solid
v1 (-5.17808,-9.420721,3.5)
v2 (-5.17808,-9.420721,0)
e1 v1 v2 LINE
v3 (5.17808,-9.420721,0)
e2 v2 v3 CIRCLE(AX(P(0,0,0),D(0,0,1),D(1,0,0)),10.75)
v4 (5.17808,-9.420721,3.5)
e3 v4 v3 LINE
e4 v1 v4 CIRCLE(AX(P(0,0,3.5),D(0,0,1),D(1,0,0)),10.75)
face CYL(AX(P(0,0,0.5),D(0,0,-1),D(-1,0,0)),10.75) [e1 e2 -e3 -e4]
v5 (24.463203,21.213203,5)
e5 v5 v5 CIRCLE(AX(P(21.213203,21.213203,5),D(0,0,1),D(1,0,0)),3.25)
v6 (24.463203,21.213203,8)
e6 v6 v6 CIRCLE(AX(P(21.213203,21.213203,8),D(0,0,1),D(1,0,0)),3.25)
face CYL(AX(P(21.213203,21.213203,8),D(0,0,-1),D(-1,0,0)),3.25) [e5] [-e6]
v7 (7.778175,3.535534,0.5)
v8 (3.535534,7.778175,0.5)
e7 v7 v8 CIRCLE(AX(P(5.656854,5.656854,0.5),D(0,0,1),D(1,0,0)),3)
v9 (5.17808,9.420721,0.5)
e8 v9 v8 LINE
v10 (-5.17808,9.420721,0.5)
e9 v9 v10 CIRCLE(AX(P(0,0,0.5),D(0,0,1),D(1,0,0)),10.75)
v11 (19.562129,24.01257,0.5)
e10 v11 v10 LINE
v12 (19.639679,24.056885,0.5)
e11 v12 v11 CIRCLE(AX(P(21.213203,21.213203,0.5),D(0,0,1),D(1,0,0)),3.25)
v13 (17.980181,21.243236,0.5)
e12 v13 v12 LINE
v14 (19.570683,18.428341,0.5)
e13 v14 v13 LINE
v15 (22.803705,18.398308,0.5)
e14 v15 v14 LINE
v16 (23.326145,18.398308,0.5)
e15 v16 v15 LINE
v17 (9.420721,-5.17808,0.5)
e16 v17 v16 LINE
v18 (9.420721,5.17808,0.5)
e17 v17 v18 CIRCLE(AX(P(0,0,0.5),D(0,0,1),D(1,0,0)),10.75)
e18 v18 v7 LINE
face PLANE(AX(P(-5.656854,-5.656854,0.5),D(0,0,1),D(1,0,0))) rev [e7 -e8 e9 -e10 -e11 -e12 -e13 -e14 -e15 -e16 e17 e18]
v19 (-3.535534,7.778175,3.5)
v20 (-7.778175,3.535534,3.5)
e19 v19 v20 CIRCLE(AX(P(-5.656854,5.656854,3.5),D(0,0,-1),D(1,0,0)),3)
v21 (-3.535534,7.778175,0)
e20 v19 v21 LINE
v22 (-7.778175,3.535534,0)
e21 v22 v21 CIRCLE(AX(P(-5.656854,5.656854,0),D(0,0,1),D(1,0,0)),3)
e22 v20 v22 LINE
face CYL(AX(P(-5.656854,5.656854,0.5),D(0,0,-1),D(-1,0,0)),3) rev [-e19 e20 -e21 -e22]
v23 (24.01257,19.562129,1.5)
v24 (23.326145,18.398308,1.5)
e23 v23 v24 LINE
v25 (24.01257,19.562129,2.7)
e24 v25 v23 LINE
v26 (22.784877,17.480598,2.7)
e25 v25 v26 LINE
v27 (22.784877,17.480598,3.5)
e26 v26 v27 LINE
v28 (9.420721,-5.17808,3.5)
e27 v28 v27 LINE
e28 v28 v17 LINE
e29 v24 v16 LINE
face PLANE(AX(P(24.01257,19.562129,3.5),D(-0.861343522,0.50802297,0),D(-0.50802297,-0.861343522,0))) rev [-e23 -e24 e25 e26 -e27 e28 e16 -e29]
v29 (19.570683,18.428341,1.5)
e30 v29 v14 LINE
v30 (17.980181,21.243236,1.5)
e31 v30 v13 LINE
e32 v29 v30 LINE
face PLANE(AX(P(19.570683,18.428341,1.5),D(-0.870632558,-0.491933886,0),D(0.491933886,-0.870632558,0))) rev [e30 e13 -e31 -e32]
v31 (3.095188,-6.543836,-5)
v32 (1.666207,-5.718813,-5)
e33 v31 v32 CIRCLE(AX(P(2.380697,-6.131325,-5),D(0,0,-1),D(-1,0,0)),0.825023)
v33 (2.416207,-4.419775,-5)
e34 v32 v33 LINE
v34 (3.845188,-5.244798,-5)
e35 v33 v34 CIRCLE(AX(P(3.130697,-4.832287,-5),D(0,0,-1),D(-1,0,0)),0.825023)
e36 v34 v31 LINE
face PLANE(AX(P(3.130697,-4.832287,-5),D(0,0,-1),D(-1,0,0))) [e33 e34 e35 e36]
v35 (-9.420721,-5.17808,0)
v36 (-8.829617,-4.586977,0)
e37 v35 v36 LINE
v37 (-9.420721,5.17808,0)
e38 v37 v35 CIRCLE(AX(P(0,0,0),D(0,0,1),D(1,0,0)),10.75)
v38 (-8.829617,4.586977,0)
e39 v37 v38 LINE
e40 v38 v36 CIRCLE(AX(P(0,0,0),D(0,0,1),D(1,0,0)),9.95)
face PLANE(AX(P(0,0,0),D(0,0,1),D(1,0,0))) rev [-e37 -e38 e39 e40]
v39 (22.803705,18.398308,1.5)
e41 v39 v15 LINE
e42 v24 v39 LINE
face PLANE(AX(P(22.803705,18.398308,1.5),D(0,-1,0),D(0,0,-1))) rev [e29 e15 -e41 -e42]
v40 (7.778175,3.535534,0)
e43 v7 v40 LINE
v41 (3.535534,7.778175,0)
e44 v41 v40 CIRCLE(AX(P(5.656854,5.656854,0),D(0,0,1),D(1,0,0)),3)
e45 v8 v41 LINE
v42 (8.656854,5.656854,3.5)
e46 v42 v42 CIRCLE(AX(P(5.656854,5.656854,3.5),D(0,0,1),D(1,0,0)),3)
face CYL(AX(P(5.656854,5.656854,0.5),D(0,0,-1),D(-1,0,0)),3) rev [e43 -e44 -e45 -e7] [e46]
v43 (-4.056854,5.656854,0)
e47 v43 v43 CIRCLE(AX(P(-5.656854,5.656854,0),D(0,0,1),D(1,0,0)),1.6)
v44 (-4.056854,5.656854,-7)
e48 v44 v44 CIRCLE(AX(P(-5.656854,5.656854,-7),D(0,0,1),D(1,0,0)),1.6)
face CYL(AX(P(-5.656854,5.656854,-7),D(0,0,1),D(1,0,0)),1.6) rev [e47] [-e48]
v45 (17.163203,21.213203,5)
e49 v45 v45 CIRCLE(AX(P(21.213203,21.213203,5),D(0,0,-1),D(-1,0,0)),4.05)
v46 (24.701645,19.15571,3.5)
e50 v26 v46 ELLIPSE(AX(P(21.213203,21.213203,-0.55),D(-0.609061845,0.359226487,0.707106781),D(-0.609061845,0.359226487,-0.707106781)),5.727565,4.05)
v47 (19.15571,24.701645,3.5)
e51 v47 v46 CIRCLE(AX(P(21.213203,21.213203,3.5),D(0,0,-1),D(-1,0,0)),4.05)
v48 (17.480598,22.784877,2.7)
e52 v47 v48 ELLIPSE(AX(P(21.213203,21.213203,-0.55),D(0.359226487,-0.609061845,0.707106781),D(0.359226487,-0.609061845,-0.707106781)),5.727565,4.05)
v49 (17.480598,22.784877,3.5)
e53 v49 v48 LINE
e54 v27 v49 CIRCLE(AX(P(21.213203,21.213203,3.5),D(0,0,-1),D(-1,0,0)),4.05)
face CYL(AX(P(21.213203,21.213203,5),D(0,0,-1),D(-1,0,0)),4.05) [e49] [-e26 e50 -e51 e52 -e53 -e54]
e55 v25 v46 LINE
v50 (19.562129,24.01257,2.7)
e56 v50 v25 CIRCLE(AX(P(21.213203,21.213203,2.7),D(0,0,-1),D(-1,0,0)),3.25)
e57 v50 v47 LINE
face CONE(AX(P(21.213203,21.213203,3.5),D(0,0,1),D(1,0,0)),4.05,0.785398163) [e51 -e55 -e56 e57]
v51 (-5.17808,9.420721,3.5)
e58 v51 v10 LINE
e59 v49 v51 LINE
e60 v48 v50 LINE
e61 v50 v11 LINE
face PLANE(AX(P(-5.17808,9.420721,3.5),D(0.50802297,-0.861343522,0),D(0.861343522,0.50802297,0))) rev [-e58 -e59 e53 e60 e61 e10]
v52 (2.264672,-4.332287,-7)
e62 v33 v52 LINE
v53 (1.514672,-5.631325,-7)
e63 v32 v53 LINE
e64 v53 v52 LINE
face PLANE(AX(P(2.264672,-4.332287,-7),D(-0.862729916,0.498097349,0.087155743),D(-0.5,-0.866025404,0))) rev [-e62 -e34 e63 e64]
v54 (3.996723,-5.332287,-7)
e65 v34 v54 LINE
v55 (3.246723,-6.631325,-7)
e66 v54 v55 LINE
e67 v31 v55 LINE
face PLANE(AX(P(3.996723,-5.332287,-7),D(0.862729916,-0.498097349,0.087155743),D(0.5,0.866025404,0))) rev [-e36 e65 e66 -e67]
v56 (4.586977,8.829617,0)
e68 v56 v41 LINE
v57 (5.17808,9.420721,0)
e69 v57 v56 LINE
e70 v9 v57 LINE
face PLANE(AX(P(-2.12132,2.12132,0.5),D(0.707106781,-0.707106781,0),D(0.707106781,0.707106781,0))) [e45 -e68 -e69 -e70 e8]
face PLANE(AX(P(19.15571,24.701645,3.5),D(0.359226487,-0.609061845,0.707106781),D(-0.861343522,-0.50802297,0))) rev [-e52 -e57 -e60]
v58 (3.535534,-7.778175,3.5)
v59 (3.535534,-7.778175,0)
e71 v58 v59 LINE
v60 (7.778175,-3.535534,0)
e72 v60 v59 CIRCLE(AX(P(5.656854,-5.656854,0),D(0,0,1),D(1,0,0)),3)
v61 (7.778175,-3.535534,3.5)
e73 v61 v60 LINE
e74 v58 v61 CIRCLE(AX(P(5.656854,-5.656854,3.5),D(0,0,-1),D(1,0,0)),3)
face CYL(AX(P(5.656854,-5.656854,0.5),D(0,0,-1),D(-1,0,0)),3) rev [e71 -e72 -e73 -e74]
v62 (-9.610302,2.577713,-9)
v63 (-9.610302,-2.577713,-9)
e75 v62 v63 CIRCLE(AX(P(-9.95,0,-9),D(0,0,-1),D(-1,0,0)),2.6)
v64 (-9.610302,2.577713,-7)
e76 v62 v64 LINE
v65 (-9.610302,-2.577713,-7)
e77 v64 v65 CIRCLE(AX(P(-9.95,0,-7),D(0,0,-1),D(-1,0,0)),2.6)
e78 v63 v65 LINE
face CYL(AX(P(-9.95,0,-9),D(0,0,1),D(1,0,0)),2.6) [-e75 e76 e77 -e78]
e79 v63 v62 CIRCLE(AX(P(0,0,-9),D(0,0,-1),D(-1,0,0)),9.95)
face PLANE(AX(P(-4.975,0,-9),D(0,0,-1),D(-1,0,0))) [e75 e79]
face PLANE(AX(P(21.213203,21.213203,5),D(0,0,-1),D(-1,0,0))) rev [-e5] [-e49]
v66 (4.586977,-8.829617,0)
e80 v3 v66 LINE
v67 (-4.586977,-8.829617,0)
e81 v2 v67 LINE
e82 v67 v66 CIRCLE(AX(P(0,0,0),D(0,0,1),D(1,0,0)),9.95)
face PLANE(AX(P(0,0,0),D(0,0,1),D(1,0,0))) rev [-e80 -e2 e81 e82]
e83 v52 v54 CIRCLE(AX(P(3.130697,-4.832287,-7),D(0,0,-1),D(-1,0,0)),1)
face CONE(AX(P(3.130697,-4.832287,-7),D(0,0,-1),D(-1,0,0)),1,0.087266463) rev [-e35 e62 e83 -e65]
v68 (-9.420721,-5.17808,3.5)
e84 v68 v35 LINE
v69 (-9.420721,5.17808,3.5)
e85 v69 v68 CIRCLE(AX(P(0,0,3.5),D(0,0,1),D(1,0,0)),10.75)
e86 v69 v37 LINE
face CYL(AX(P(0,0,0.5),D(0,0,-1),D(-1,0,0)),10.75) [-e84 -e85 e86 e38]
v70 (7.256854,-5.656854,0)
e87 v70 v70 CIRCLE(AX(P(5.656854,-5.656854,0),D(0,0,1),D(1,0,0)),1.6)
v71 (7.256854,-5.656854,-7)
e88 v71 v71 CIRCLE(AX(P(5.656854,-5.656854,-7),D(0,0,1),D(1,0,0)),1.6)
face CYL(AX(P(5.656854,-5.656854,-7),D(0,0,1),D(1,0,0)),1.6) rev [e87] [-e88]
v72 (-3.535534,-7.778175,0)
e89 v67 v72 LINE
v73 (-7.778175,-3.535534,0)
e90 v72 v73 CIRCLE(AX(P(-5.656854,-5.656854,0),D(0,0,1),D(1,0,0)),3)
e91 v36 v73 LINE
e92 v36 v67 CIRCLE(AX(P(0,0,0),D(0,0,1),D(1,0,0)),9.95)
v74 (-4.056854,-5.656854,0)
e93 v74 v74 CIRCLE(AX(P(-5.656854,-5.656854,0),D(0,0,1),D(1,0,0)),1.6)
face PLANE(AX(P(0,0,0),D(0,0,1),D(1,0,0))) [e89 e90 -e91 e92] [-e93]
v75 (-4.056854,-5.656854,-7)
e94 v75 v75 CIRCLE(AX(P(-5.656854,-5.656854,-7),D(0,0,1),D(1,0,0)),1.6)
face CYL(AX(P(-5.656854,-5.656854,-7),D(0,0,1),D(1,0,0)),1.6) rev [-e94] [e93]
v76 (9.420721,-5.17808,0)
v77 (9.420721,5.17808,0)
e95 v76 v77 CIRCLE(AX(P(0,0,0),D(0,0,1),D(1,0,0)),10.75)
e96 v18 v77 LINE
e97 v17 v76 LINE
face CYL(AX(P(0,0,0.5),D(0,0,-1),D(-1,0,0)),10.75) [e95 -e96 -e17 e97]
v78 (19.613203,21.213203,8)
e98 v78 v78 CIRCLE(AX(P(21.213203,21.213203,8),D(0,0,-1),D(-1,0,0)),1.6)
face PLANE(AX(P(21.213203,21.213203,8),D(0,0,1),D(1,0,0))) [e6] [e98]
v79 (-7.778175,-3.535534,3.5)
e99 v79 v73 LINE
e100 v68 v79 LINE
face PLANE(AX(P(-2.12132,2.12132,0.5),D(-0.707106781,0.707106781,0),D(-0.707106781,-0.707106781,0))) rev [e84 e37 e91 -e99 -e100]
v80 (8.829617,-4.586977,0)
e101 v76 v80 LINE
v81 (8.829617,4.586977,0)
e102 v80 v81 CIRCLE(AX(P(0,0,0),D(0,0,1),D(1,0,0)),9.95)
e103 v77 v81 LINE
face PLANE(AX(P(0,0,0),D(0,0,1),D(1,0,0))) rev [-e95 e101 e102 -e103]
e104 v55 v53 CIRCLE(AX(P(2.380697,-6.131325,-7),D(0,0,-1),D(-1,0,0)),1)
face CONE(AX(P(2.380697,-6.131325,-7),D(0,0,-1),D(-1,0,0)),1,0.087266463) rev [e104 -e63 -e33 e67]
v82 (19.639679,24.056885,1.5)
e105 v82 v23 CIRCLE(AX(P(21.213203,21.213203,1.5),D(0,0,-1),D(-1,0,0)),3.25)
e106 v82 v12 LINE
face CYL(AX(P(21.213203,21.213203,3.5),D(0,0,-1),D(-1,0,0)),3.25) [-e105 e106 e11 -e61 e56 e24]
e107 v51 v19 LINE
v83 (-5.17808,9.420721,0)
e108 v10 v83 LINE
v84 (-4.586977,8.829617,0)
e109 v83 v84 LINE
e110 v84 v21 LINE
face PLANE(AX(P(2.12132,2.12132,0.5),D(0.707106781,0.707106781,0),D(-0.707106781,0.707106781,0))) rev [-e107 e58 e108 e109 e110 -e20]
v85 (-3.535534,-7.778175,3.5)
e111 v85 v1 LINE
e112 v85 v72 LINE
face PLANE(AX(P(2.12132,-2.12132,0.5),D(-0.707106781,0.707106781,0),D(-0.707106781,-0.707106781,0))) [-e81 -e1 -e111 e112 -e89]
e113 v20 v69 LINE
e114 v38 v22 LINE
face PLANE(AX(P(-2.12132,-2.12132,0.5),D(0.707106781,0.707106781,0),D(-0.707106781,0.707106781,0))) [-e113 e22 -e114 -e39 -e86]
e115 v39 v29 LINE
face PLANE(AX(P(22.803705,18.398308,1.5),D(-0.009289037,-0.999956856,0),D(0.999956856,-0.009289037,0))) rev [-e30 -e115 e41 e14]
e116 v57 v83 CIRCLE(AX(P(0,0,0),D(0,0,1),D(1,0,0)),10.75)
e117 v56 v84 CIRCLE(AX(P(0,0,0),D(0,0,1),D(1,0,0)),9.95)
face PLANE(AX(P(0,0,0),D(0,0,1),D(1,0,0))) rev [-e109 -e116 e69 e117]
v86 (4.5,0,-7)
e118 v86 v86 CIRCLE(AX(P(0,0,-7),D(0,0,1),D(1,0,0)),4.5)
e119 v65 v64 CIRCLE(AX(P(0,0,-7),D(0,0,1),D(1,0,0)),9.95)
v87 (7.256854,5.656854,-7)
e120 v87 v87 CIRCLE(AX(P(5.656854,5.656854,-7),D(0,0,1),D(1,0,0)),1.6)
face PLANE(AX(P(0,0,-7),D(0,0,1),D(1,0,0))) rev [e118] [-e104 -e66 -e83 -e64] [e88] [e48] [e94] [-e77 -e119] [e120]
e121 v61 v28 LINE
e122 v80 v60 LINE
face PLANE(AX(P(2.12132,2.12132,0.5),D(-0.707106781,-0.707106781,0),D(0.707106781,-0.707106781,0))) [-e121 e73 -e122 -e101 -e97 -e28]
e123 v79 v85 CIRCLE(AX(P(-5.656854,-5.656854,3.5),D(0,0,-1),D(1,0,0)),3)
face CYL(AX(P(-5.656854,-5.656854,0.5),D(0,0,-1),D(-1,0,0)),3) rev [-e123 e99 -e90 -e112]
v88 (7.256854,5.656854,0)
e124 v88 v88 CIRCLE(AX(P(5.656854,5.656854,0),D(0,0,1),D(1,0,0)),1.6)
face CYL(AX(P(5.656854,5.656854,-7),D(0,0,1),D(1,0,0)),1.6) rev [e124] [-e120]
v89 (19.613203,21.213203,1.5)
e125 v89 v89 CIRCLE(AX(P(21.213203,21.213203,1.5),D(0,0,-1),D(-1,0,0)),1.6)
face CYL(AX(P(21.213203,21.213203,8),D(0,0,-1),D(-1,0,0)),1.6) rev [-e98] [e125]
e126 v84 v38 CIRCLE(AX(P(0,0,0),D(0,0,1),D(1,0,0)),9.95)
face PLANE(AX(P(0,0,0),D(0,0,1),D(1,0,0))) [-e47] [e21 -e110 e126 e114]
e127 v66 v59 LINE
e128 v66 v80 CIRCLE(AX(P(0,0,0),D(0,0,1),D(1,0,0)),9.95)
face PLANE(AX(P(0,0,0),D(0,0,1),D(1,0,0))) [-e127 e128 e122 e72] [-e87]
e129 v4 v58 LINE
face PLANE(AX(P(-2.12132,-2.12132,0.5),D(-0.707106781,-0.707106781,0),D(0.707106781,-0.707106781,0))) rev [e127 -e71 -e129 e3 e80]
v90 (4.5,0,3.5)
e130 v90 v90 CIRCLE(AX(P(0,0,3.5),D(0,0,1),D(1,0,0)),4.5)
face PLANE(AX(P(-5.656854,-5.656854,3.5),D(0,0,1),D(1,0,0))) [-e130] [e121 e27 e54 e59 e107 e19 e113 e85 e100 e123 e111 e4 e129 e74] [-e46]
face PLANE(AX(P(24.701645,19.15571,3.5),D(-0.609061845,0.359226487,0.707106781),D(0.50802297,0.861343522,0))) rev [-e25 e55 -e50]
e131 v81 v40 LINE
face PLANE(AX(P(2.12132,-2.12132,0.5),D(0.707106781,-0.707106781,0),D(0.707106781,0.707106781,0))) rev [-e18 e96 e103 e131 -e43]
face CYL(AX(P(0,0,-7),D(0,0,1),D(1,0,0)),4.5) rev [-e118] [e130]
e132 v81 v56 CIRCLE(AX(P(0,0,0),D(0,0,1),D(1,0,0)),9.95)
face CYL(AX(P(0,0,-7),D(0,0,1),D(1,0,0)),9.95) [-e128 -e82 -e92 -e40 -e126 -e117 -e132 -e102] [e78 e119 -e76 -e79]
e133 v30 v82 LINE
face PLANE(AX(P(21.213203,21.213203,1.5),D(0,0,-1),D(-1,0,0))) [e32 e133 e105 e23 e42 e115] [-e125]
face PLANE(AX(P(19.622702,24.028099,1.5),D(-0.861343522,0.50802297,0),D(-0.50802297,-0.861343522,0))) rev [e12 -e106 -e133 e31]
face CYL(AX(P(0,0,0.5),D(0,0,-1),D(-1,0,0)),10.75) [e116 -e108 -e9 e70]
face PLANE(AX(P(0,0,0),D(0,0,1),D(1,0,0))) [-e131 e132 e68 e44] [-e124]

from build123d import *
from build123d.topology import SkipClean

# Parameters (mm, degrees)
SKETCH1_R           = 9.95
SKETCH1_R_2         = 4.5
SKETCH1_R_3         = 1.6
BOSS_EXTRUDE1_DEPTH = 7
BOSS_EXTRUDE3_START = 0.5
SKETCH3_R           = 4.5
BOSS_EXTRUDE3_DEPTH = 0.5
BOSS_EXTRUDE4_START = 3
SKETCH5_R           = 3
SKETCH5_R_2         = 4.5
BOSS_EXTRUDE4_DEPTH = 3
SKETCH6_R           = 4.05
BOSS_EXTRUDE5_DEPTH = 1.5
BOSS_EXTRUDE6_START = 3
SKETCH7_R           = 3.25
BOSS_EXTRUDE6_DEPTH = 3
CHAMFER1_SIZE       = 0.8
CUT_EXTRUDE1_START  = -1
CUT_EXTRUDE1_DEPTH  = 1
SKETCH9_R           = 1.6
CUT_EXTRUDE2_DEPTH  = 37.724772234
BOSS_EXTRUDE7_DEPTH = 2
CUT_EXTRUDE3_DEPTH  = 2
CUT_EXTRUDE3_DRAFT  = -5


with BuildPart() as part:
    # Sketch1 → Boss-Extrude1 (new body)
    with BuildSketch(Plane.XY):
        Circle(SKETCH1_R)
        Circle(SKETCH1_R_2, mode=Mode.SUBTRACT)
        with Locations((-5.656854249, -5.656854249)):
            Circle(SKETCH1_R_3, mode=Mode.SUBTRACT)
        with Locations((-5.656854249, 5.656854249)):
            Circle(SKETCH1_R_3, mode=Mode.SUBTRACT)
        with Locations((5.656854249, 5.656854249)):
            Circle(SKETCH1_R_3, mode=Mode.SUBTRACT)
        with Locations((5.656854249, -5.656854249)):
            Circle(SKETCH1_R_3, mode=Mode.SUBTRACT)
    extrude(amount=-BOSS_EXTRUDE1_DEPTH)

    # Sketch3 → Boss-Extrude3 (add)
    # profile 1 of 5: a face of its own
    with BuildSketch(Plane.XY.offset(BOSS_EXTRUDE3_START)):
        with BuildLine():
            ThreePointArc((4.586976758, 8.829617445), (0, 9.95), (-4.586976758, 8.829617445))
            Line((-4.586976758, 8.829617445), (-3.535533906, 7.778174593))
            ThreePointArc((-3.535533906, 7.778174593), (-3.535533906, 3.535533906), (-7.778174593, 3.535533906))
            Line((-7.778174593, 3.535533906), (-8.829617445, 4.586976758))
            ThreePointArc((-8.829617445, 4.586976758), (-9.95, 0), (-8.829617445, -4.586976758))
            Line((-8.829617445, -4.586976758), (-7.778174593, -3.535533906))
            ThreePointArc((-7.778174593, -3.535533906), (-3.535533906, -3.535533906), (-3.535533906, -7.778174593))
            Line((-3.535533906, -7.778174593), (-4.586976758, -8.829617445))
            ThreePointArc((-4.586976758, -8.829617445), (0, -9.95), (4.586976758, -8.829617445))
            Line((4.586976758, -8.829617445), (3.535533906, -7.778174593))
            ThreePointArc((3.535533906, -7.778174593), (3.535533906, -3.535533906), (7.778174593, -3.535533906))
            Line((7.778174593, -3.535533906), (8.829617445, -4.586976758))
            ThreePointArc((8.829617445, -4.586976758), (9.665846926, -2.360911521), (9.95, 0))
            ThreePointArc((9.95, 0), (9.665846926, 2.360911521), (8.829617445, 4.586976758))
            Line((8.829617445, 4.586976758), (7.778174593, 3.535533906))
            ThreePointArc((7.778174593, 3.535533906), (3.535533906, 3.535533906), (3.535533906, 7.778174593))
            Line((3.535533906, 7.778174593), (4.586976758, 8.829617445))
        make_face()
        Circle(SKETCH3_R, mode=Mode.SUBTRACT)
    # profile 2 of 5: a face of its own
    with BuildSketch(Plane.XY.offset(BOSS_EXTRUDE3_START)):
        with BuildLine():
            Line((-8.829617445, 4.586976758), (-9.420721004, 5.178080317))
            ThreePointArc((-9.420721004, 5.178080317), (-10.75, 0), (-9.420721004, -5.178080317))
            Line((-9.420721004, -5.178080317), (-8.829617445, -4.586976758))
            ThreePointArc((-8.829617445, -4.586976758), (-9.95, 0), (-8.829617445, 4.586976758))
        make_face()
    # profile 3 of 5: a face of its own
    with BuildSketch(Plane.XY.offset(BOSS_EXTRUDE3_START)):
        with BuildLine():
            ThreePointArc((5.178080317, 9.420721004), (0, 10.75), (-5.178080317, 9.420721004))
            Line((-5.178080317, 9.420721004), (-4.586976758, 8.829617445))
            ThreePointArc((-4.586976758, 8.829617445), (0, 9.95), (4.586976758, 8.829617445))
            Line((4.586976758, 8.829617445), (5.178080317, 9.420721004))
        make_face()
    # profile 4 of 5: a face of its own
    with BuildSketch(Plane.XY.offset(BOSS_EXTRUDE3_START)):
        with BuildLine():
            ThreePointArc((10.75, 0), (10.41237847, 2.672989825), (9.420721004, 5.178080317))
            Line((9.420721004, 5.178080317), (8.829617445, 4.586976758))
            ThreePointArc((8.829617445, 4.586976758), (9.665846926, 2.360911521), (9.95, 0))
            ThreePointArc((9.95, 0), (9.665846926, -2.360911521), (8.829617445, -4.586976758))
            Line((8.829617445, -4.586976758), (9.420721004, -5.178080317))
            ThreePointArc((9.420721004, -5.178080317), (10.41237847, -2.672989825), (10.75, 0))
        make_face()
    # profile 5 of 5: a face of its own
    with BuildSketch(Plane.XY.offset(BOSS_EXTRUDE3_START)):
        with BuildLine():
            Line((-4.586976758, -8.829617445), (-5.178080317, -9.420721004))
            ThreePointArc((-5.178080317, -9.420721004), (0, -10.75), (5.178080317, -9.420721004))
            Line((5.178080317, -9.420721004), (4.586976758, -8.829617445))
            ThreePointArc((4.586976758, -8.829617445), (0, -9.95), (-4.586976758, -8.829617445))
        make_face()
    extrude(amount=-BOSS_EXTRUDE3_DEPTH)

    # Sketch5 → Boss-Extrude4 (add)
    with SkipClean():  # the faces are left unmerged after this step: merging them gives an invalid solid
        with BuildSketch(Plane.XY.offset(0.5).offset(BOSS_EXTRUDE4_START)):
            with BuildLine():
                Line((-5.178080317, 9.420721004), (19.562128784, 24.012569881))
                ThreePointArc((19.562128784, 24.012569881), (23.511300474, 23.511300474), (24.012569881, 19.562128784))
                Line((24.012569881, 19.562128784), (9.420721004, -5.178080317))
                Line((9.420721004, -5.178080317), (7.778174593, -3.535533906))
                ThreePointArc((7.778174593, -3.535533906), (3.535533906, -3.535533906), (3.535533906, -7.778174593))
                Line((3.535533906, -7.778174593), (5.178080317, -9.420721004))
                ThreePointArc((5.178080317, -9.420721004), (0, -10.75), (-5.178080317, -9.420721004))
                Line((-5.178080317, -9.420721004), (-3.535533906, -7.778174593))
                ThreePointArc((-3.535533906, -7.778174593), (-3.535533906, -3.535533906), (-7.778174593, -3.535533906))
                Line((-7.778174593, -3.535533906), (-9.420721004, -5.178080317))
                ThreePointArc((-9.420721004, -5.178080317), (-10.75, 0), (-9.420721004, 5.178080317))
                Line((-9.420721004, 5.178080317), (-7.778174593, 3.535533906))
                ThreePointArc((-7.778174593, 3.535533906), (-3.535533906, 3.535533906), (-3.535533906, 7.778174593))
                Line((-3.535533906, 7.778174593), (-5.178080317, 9.420721004))
            make_face()
            with Locations(Location((5.656854249, 5.656854249, 0), (0, 0, 135))):
                Circle(SKETCH5_R, mode=Mode.SUBTRACT)
            Circle(SKETCH5_R_2, mode=Mode.SUBTRACT)
        extrude(amount=-BOSS_EXTRUDE4_DEPTH)

    # Sketch6 → Boss-Extrude5 (add)
    with SkipClean():  # the faces are left unmerged after this step: merging them gives an invalid solid
        with BuildSketch(Plane(origin=(0, 0, 3.5), x_dir=(-1, 0, 0), z_dir=(0, 0, -1))):
            with Locations((-21.213203436, 21.213203436)):
                Circle(SKETCH6_R)
        extrude(amount=-BOSS_EXTRUDE5_DEPTH)

    # Sketch7 → Boss-Extrude6 (add)
    with SkipClean():  # the faces are left unmerged after this step: merging them gives an invalid solid
        with BuildSketch(Plane.XY.offset(5).offset(BOSS_EXTRUDE6_START)):
            with Locations((21.213203436, 21.213203436)):
                Circle(SKETCH7_R)
        extrude(amount=-BOSS_EXTRUDE6_DEPTH)

    # Chamfer1
    # the kernel refuses this chamfer: 0.8 mm, written as the material it adds along each edge
    with BuildSketch(Plane(origin=(24.012569881, 19.562128784, 3.5), x_dir=(-0.02368339518990366, 0.013968536890575577, -0.9996219169112968), z_dir=(-0.5080229697131419, -0.8613435216241195, 0))) as chamfer1_piece_1_section:
        Polygon((CHAMFER1_SIZE * 0.999621916911, CHAMFER1_SIZE * 0.0274958766106), (-CHAMFER1_SIZE * 0.0274958766106, CHAMFER1_SIZE * 0.999621916911), (0, 0), align=None)
    chamfer1_piece_1 = extrude(amount=4.473955585, mode=Mode.PRIVATE)
    chamfer1_piece_1 = chamfer1_piece_1 & Plane(origin=(21.213203436, 21.213203436, 3.215245779), x_dir=(-1, 0, 0), z_dir=(0, 0, -1)) * Cylinder(4.05, 13, mode=Mode.PRIVATE)
    add(chamfer1_piece_1)
    with BuildSketch(Plane(origin=(21.213203436, 21.213203436, 3.5), x_dir=(-0.508022969713124, 0.8613435216241301, 0), z_dir=(-0.8613435216241301, -0.508022969713124, 0))) as chamfer1_piece_2:
        Polygon((3.25, CHAMFER1_SIZE), (3.25 + CHAMFER1_SIZE, 0), (3.25, 0), align=None)
    revolve(axis=Axis((21.213203436, 21.213203436, 3.5), (0, 0, -1)), revolution_arc=151.064460502)
    with BuildSketch(Plane(origin=(15.708516125, 21.739697678, 3.5), x_dir=(0.01396853689057517, -0.0236833951899039, -0.9996219169112968), z_dir=(0.8613435216241283, 0.508022969713127, 0))) as chamfer1_piece_3_section:
        Polygon((CHAMFER1_SIZE * 0.999621916911, CHAMFER1_SIZE * 0.0274958766106), (-CHAMFER1_SIZE * 0.0274958766106, CHAMFER1_SIZE * 0.999621916911), (0, 0), align=None)
    chamfer1_piece_3 = extrude(amount=4.473955585, mode=Mode.PRIVATE)
    chamfer1_piece_3 = chamfer1_piece_3 & Plane(origin=(21.213203436, 21.213203436, 3.215245779), x_dir=(-1, 0, 0), z_dir=(0, 0, -1)) * Cylinder(4.05, 13, mode=Mode.PRIVATE)
    add(chamfer1_piece_3)

    # Sketch8 → Cut-Extrude1 (cut)
    with BuildSketch(Plane(origin=(0, 0, 0.5), x_dir=(-1, 0, 0), z_dir=(0, 0, -1)).offset(CUT_EXTRUDE1_START)):
        with BuildLine():
            Line((-22.803705141, 18.398307761), (-19.570683125, 18.428340717))
            Line((-19.570683125, 18.428340717), (-17.98018142, 21.243236391))
            Line((-17.98018142, 21.243236391), (-19.62270173, 24.02809911))
            Line((-19.62270173, 24.02809911), (-19.639679475, 24.056884561))
            ThreePointArc((-19.639679475, 24.056884561), (-23.542662563, 23.479504425), (-24.012569881, 19.562128784))
            Line((-24.012569881, 19.562128784), (-23.326144782, 18.398307761))
            Line((-23.326144782, 18.398307761), (-22.803705141, 18.398307761))
        make_face()
    extrude(amount=CUT_EXTRUDE1_DEPTH, mode=Mode.SUBTRACT)

    # Sketch9 → Cut-Extrude2 (cut, through all)
    with BuildSketch(Plane(origin=(0, 0, 1.5), x_dir=(-1, 0, 0), z_dir=(0, 0, -1))):
        with Locations((-21.213203436, 21.213203436)):
            Circle(SKETCH9_R)
    extrude(amount=-CUT_EXTRUDE2_DEPTH, mode=Mode.SUBTRACT)

    # Sketch10 → Boss-Extrude7 (add)
    with BuildSketch(Plane(origin=(0, 0, -7), x_dir=(-1, 0, 0), z_dir=(0, 0, -1))):
        with BuildLine():
            ThreePointArc((9.610301508, 2.577713121), (7.35, 0), (9.610301508, -2.577713121))
            ThreePointArc((9.610301508, -2.577713121), (9.95, 0), (9.610301508, 2.577713121))
        make_face()
    extrude(amount=BOSS_EXTRUDE7_DEPTH)


with BuildPart() as cut_extrude3_tool:
    # Sketch11 → Cut-Extrude3 (with draft: the straight prism first)
    with BuildSketch(Plane(origin=(0, 0, -7), x_dir=(-1, 0, 0), z_dir=(0, 0, -1))):
        with BuildLine():
            ThreePointArc((-2.26467179, -4.332286617), (-3.630697194, -3.966261214), (-3.996722598, -5.332286617))
            Line((-3.996722598, -5.332286617), (-3.246722598, -6.631324723))
            ThreePointArc((-3.246722598, -6.631324723), (-1.880697194, -6.997350127), (-1.51467179, -5.631324723))
            Line((-1.51467179, -5.631324723), (-2.26467179, -4.332286617))
        make_face()
    extrude(amount=-CUT_EXTRUDE3_DEPTH)
    # Cut-Extrude3: the draft: its side faces are tilted about the plane it starts from
    cut_extrude3_sides = [cut_extrude3_tool.faces().sort_by_distance(p)[0] for p in [
        (1.880697194, -6.997350127, -6),
        (1.88967179, -4.98180567, -6),
        (3.630697194, -3.966261214, -6),
        (3.621722598, -5.98180567, -6),
    ]]
    draft(cut_extrude3_sides, Plane(origin=(0, 0, -7), x_dir=(-1, 0, 0), z_dir=(0, 0, -1)), CUT_EXTRUDE3_DRAFT)


with BuildPart() as part_1:
    add(part.part)

    # Cut-Extrude3: cut by cut_extrude3_tool
    add(cut_extrude3_tool.part, mode=Mode.SUBTRACT)


solid = part_1.part
